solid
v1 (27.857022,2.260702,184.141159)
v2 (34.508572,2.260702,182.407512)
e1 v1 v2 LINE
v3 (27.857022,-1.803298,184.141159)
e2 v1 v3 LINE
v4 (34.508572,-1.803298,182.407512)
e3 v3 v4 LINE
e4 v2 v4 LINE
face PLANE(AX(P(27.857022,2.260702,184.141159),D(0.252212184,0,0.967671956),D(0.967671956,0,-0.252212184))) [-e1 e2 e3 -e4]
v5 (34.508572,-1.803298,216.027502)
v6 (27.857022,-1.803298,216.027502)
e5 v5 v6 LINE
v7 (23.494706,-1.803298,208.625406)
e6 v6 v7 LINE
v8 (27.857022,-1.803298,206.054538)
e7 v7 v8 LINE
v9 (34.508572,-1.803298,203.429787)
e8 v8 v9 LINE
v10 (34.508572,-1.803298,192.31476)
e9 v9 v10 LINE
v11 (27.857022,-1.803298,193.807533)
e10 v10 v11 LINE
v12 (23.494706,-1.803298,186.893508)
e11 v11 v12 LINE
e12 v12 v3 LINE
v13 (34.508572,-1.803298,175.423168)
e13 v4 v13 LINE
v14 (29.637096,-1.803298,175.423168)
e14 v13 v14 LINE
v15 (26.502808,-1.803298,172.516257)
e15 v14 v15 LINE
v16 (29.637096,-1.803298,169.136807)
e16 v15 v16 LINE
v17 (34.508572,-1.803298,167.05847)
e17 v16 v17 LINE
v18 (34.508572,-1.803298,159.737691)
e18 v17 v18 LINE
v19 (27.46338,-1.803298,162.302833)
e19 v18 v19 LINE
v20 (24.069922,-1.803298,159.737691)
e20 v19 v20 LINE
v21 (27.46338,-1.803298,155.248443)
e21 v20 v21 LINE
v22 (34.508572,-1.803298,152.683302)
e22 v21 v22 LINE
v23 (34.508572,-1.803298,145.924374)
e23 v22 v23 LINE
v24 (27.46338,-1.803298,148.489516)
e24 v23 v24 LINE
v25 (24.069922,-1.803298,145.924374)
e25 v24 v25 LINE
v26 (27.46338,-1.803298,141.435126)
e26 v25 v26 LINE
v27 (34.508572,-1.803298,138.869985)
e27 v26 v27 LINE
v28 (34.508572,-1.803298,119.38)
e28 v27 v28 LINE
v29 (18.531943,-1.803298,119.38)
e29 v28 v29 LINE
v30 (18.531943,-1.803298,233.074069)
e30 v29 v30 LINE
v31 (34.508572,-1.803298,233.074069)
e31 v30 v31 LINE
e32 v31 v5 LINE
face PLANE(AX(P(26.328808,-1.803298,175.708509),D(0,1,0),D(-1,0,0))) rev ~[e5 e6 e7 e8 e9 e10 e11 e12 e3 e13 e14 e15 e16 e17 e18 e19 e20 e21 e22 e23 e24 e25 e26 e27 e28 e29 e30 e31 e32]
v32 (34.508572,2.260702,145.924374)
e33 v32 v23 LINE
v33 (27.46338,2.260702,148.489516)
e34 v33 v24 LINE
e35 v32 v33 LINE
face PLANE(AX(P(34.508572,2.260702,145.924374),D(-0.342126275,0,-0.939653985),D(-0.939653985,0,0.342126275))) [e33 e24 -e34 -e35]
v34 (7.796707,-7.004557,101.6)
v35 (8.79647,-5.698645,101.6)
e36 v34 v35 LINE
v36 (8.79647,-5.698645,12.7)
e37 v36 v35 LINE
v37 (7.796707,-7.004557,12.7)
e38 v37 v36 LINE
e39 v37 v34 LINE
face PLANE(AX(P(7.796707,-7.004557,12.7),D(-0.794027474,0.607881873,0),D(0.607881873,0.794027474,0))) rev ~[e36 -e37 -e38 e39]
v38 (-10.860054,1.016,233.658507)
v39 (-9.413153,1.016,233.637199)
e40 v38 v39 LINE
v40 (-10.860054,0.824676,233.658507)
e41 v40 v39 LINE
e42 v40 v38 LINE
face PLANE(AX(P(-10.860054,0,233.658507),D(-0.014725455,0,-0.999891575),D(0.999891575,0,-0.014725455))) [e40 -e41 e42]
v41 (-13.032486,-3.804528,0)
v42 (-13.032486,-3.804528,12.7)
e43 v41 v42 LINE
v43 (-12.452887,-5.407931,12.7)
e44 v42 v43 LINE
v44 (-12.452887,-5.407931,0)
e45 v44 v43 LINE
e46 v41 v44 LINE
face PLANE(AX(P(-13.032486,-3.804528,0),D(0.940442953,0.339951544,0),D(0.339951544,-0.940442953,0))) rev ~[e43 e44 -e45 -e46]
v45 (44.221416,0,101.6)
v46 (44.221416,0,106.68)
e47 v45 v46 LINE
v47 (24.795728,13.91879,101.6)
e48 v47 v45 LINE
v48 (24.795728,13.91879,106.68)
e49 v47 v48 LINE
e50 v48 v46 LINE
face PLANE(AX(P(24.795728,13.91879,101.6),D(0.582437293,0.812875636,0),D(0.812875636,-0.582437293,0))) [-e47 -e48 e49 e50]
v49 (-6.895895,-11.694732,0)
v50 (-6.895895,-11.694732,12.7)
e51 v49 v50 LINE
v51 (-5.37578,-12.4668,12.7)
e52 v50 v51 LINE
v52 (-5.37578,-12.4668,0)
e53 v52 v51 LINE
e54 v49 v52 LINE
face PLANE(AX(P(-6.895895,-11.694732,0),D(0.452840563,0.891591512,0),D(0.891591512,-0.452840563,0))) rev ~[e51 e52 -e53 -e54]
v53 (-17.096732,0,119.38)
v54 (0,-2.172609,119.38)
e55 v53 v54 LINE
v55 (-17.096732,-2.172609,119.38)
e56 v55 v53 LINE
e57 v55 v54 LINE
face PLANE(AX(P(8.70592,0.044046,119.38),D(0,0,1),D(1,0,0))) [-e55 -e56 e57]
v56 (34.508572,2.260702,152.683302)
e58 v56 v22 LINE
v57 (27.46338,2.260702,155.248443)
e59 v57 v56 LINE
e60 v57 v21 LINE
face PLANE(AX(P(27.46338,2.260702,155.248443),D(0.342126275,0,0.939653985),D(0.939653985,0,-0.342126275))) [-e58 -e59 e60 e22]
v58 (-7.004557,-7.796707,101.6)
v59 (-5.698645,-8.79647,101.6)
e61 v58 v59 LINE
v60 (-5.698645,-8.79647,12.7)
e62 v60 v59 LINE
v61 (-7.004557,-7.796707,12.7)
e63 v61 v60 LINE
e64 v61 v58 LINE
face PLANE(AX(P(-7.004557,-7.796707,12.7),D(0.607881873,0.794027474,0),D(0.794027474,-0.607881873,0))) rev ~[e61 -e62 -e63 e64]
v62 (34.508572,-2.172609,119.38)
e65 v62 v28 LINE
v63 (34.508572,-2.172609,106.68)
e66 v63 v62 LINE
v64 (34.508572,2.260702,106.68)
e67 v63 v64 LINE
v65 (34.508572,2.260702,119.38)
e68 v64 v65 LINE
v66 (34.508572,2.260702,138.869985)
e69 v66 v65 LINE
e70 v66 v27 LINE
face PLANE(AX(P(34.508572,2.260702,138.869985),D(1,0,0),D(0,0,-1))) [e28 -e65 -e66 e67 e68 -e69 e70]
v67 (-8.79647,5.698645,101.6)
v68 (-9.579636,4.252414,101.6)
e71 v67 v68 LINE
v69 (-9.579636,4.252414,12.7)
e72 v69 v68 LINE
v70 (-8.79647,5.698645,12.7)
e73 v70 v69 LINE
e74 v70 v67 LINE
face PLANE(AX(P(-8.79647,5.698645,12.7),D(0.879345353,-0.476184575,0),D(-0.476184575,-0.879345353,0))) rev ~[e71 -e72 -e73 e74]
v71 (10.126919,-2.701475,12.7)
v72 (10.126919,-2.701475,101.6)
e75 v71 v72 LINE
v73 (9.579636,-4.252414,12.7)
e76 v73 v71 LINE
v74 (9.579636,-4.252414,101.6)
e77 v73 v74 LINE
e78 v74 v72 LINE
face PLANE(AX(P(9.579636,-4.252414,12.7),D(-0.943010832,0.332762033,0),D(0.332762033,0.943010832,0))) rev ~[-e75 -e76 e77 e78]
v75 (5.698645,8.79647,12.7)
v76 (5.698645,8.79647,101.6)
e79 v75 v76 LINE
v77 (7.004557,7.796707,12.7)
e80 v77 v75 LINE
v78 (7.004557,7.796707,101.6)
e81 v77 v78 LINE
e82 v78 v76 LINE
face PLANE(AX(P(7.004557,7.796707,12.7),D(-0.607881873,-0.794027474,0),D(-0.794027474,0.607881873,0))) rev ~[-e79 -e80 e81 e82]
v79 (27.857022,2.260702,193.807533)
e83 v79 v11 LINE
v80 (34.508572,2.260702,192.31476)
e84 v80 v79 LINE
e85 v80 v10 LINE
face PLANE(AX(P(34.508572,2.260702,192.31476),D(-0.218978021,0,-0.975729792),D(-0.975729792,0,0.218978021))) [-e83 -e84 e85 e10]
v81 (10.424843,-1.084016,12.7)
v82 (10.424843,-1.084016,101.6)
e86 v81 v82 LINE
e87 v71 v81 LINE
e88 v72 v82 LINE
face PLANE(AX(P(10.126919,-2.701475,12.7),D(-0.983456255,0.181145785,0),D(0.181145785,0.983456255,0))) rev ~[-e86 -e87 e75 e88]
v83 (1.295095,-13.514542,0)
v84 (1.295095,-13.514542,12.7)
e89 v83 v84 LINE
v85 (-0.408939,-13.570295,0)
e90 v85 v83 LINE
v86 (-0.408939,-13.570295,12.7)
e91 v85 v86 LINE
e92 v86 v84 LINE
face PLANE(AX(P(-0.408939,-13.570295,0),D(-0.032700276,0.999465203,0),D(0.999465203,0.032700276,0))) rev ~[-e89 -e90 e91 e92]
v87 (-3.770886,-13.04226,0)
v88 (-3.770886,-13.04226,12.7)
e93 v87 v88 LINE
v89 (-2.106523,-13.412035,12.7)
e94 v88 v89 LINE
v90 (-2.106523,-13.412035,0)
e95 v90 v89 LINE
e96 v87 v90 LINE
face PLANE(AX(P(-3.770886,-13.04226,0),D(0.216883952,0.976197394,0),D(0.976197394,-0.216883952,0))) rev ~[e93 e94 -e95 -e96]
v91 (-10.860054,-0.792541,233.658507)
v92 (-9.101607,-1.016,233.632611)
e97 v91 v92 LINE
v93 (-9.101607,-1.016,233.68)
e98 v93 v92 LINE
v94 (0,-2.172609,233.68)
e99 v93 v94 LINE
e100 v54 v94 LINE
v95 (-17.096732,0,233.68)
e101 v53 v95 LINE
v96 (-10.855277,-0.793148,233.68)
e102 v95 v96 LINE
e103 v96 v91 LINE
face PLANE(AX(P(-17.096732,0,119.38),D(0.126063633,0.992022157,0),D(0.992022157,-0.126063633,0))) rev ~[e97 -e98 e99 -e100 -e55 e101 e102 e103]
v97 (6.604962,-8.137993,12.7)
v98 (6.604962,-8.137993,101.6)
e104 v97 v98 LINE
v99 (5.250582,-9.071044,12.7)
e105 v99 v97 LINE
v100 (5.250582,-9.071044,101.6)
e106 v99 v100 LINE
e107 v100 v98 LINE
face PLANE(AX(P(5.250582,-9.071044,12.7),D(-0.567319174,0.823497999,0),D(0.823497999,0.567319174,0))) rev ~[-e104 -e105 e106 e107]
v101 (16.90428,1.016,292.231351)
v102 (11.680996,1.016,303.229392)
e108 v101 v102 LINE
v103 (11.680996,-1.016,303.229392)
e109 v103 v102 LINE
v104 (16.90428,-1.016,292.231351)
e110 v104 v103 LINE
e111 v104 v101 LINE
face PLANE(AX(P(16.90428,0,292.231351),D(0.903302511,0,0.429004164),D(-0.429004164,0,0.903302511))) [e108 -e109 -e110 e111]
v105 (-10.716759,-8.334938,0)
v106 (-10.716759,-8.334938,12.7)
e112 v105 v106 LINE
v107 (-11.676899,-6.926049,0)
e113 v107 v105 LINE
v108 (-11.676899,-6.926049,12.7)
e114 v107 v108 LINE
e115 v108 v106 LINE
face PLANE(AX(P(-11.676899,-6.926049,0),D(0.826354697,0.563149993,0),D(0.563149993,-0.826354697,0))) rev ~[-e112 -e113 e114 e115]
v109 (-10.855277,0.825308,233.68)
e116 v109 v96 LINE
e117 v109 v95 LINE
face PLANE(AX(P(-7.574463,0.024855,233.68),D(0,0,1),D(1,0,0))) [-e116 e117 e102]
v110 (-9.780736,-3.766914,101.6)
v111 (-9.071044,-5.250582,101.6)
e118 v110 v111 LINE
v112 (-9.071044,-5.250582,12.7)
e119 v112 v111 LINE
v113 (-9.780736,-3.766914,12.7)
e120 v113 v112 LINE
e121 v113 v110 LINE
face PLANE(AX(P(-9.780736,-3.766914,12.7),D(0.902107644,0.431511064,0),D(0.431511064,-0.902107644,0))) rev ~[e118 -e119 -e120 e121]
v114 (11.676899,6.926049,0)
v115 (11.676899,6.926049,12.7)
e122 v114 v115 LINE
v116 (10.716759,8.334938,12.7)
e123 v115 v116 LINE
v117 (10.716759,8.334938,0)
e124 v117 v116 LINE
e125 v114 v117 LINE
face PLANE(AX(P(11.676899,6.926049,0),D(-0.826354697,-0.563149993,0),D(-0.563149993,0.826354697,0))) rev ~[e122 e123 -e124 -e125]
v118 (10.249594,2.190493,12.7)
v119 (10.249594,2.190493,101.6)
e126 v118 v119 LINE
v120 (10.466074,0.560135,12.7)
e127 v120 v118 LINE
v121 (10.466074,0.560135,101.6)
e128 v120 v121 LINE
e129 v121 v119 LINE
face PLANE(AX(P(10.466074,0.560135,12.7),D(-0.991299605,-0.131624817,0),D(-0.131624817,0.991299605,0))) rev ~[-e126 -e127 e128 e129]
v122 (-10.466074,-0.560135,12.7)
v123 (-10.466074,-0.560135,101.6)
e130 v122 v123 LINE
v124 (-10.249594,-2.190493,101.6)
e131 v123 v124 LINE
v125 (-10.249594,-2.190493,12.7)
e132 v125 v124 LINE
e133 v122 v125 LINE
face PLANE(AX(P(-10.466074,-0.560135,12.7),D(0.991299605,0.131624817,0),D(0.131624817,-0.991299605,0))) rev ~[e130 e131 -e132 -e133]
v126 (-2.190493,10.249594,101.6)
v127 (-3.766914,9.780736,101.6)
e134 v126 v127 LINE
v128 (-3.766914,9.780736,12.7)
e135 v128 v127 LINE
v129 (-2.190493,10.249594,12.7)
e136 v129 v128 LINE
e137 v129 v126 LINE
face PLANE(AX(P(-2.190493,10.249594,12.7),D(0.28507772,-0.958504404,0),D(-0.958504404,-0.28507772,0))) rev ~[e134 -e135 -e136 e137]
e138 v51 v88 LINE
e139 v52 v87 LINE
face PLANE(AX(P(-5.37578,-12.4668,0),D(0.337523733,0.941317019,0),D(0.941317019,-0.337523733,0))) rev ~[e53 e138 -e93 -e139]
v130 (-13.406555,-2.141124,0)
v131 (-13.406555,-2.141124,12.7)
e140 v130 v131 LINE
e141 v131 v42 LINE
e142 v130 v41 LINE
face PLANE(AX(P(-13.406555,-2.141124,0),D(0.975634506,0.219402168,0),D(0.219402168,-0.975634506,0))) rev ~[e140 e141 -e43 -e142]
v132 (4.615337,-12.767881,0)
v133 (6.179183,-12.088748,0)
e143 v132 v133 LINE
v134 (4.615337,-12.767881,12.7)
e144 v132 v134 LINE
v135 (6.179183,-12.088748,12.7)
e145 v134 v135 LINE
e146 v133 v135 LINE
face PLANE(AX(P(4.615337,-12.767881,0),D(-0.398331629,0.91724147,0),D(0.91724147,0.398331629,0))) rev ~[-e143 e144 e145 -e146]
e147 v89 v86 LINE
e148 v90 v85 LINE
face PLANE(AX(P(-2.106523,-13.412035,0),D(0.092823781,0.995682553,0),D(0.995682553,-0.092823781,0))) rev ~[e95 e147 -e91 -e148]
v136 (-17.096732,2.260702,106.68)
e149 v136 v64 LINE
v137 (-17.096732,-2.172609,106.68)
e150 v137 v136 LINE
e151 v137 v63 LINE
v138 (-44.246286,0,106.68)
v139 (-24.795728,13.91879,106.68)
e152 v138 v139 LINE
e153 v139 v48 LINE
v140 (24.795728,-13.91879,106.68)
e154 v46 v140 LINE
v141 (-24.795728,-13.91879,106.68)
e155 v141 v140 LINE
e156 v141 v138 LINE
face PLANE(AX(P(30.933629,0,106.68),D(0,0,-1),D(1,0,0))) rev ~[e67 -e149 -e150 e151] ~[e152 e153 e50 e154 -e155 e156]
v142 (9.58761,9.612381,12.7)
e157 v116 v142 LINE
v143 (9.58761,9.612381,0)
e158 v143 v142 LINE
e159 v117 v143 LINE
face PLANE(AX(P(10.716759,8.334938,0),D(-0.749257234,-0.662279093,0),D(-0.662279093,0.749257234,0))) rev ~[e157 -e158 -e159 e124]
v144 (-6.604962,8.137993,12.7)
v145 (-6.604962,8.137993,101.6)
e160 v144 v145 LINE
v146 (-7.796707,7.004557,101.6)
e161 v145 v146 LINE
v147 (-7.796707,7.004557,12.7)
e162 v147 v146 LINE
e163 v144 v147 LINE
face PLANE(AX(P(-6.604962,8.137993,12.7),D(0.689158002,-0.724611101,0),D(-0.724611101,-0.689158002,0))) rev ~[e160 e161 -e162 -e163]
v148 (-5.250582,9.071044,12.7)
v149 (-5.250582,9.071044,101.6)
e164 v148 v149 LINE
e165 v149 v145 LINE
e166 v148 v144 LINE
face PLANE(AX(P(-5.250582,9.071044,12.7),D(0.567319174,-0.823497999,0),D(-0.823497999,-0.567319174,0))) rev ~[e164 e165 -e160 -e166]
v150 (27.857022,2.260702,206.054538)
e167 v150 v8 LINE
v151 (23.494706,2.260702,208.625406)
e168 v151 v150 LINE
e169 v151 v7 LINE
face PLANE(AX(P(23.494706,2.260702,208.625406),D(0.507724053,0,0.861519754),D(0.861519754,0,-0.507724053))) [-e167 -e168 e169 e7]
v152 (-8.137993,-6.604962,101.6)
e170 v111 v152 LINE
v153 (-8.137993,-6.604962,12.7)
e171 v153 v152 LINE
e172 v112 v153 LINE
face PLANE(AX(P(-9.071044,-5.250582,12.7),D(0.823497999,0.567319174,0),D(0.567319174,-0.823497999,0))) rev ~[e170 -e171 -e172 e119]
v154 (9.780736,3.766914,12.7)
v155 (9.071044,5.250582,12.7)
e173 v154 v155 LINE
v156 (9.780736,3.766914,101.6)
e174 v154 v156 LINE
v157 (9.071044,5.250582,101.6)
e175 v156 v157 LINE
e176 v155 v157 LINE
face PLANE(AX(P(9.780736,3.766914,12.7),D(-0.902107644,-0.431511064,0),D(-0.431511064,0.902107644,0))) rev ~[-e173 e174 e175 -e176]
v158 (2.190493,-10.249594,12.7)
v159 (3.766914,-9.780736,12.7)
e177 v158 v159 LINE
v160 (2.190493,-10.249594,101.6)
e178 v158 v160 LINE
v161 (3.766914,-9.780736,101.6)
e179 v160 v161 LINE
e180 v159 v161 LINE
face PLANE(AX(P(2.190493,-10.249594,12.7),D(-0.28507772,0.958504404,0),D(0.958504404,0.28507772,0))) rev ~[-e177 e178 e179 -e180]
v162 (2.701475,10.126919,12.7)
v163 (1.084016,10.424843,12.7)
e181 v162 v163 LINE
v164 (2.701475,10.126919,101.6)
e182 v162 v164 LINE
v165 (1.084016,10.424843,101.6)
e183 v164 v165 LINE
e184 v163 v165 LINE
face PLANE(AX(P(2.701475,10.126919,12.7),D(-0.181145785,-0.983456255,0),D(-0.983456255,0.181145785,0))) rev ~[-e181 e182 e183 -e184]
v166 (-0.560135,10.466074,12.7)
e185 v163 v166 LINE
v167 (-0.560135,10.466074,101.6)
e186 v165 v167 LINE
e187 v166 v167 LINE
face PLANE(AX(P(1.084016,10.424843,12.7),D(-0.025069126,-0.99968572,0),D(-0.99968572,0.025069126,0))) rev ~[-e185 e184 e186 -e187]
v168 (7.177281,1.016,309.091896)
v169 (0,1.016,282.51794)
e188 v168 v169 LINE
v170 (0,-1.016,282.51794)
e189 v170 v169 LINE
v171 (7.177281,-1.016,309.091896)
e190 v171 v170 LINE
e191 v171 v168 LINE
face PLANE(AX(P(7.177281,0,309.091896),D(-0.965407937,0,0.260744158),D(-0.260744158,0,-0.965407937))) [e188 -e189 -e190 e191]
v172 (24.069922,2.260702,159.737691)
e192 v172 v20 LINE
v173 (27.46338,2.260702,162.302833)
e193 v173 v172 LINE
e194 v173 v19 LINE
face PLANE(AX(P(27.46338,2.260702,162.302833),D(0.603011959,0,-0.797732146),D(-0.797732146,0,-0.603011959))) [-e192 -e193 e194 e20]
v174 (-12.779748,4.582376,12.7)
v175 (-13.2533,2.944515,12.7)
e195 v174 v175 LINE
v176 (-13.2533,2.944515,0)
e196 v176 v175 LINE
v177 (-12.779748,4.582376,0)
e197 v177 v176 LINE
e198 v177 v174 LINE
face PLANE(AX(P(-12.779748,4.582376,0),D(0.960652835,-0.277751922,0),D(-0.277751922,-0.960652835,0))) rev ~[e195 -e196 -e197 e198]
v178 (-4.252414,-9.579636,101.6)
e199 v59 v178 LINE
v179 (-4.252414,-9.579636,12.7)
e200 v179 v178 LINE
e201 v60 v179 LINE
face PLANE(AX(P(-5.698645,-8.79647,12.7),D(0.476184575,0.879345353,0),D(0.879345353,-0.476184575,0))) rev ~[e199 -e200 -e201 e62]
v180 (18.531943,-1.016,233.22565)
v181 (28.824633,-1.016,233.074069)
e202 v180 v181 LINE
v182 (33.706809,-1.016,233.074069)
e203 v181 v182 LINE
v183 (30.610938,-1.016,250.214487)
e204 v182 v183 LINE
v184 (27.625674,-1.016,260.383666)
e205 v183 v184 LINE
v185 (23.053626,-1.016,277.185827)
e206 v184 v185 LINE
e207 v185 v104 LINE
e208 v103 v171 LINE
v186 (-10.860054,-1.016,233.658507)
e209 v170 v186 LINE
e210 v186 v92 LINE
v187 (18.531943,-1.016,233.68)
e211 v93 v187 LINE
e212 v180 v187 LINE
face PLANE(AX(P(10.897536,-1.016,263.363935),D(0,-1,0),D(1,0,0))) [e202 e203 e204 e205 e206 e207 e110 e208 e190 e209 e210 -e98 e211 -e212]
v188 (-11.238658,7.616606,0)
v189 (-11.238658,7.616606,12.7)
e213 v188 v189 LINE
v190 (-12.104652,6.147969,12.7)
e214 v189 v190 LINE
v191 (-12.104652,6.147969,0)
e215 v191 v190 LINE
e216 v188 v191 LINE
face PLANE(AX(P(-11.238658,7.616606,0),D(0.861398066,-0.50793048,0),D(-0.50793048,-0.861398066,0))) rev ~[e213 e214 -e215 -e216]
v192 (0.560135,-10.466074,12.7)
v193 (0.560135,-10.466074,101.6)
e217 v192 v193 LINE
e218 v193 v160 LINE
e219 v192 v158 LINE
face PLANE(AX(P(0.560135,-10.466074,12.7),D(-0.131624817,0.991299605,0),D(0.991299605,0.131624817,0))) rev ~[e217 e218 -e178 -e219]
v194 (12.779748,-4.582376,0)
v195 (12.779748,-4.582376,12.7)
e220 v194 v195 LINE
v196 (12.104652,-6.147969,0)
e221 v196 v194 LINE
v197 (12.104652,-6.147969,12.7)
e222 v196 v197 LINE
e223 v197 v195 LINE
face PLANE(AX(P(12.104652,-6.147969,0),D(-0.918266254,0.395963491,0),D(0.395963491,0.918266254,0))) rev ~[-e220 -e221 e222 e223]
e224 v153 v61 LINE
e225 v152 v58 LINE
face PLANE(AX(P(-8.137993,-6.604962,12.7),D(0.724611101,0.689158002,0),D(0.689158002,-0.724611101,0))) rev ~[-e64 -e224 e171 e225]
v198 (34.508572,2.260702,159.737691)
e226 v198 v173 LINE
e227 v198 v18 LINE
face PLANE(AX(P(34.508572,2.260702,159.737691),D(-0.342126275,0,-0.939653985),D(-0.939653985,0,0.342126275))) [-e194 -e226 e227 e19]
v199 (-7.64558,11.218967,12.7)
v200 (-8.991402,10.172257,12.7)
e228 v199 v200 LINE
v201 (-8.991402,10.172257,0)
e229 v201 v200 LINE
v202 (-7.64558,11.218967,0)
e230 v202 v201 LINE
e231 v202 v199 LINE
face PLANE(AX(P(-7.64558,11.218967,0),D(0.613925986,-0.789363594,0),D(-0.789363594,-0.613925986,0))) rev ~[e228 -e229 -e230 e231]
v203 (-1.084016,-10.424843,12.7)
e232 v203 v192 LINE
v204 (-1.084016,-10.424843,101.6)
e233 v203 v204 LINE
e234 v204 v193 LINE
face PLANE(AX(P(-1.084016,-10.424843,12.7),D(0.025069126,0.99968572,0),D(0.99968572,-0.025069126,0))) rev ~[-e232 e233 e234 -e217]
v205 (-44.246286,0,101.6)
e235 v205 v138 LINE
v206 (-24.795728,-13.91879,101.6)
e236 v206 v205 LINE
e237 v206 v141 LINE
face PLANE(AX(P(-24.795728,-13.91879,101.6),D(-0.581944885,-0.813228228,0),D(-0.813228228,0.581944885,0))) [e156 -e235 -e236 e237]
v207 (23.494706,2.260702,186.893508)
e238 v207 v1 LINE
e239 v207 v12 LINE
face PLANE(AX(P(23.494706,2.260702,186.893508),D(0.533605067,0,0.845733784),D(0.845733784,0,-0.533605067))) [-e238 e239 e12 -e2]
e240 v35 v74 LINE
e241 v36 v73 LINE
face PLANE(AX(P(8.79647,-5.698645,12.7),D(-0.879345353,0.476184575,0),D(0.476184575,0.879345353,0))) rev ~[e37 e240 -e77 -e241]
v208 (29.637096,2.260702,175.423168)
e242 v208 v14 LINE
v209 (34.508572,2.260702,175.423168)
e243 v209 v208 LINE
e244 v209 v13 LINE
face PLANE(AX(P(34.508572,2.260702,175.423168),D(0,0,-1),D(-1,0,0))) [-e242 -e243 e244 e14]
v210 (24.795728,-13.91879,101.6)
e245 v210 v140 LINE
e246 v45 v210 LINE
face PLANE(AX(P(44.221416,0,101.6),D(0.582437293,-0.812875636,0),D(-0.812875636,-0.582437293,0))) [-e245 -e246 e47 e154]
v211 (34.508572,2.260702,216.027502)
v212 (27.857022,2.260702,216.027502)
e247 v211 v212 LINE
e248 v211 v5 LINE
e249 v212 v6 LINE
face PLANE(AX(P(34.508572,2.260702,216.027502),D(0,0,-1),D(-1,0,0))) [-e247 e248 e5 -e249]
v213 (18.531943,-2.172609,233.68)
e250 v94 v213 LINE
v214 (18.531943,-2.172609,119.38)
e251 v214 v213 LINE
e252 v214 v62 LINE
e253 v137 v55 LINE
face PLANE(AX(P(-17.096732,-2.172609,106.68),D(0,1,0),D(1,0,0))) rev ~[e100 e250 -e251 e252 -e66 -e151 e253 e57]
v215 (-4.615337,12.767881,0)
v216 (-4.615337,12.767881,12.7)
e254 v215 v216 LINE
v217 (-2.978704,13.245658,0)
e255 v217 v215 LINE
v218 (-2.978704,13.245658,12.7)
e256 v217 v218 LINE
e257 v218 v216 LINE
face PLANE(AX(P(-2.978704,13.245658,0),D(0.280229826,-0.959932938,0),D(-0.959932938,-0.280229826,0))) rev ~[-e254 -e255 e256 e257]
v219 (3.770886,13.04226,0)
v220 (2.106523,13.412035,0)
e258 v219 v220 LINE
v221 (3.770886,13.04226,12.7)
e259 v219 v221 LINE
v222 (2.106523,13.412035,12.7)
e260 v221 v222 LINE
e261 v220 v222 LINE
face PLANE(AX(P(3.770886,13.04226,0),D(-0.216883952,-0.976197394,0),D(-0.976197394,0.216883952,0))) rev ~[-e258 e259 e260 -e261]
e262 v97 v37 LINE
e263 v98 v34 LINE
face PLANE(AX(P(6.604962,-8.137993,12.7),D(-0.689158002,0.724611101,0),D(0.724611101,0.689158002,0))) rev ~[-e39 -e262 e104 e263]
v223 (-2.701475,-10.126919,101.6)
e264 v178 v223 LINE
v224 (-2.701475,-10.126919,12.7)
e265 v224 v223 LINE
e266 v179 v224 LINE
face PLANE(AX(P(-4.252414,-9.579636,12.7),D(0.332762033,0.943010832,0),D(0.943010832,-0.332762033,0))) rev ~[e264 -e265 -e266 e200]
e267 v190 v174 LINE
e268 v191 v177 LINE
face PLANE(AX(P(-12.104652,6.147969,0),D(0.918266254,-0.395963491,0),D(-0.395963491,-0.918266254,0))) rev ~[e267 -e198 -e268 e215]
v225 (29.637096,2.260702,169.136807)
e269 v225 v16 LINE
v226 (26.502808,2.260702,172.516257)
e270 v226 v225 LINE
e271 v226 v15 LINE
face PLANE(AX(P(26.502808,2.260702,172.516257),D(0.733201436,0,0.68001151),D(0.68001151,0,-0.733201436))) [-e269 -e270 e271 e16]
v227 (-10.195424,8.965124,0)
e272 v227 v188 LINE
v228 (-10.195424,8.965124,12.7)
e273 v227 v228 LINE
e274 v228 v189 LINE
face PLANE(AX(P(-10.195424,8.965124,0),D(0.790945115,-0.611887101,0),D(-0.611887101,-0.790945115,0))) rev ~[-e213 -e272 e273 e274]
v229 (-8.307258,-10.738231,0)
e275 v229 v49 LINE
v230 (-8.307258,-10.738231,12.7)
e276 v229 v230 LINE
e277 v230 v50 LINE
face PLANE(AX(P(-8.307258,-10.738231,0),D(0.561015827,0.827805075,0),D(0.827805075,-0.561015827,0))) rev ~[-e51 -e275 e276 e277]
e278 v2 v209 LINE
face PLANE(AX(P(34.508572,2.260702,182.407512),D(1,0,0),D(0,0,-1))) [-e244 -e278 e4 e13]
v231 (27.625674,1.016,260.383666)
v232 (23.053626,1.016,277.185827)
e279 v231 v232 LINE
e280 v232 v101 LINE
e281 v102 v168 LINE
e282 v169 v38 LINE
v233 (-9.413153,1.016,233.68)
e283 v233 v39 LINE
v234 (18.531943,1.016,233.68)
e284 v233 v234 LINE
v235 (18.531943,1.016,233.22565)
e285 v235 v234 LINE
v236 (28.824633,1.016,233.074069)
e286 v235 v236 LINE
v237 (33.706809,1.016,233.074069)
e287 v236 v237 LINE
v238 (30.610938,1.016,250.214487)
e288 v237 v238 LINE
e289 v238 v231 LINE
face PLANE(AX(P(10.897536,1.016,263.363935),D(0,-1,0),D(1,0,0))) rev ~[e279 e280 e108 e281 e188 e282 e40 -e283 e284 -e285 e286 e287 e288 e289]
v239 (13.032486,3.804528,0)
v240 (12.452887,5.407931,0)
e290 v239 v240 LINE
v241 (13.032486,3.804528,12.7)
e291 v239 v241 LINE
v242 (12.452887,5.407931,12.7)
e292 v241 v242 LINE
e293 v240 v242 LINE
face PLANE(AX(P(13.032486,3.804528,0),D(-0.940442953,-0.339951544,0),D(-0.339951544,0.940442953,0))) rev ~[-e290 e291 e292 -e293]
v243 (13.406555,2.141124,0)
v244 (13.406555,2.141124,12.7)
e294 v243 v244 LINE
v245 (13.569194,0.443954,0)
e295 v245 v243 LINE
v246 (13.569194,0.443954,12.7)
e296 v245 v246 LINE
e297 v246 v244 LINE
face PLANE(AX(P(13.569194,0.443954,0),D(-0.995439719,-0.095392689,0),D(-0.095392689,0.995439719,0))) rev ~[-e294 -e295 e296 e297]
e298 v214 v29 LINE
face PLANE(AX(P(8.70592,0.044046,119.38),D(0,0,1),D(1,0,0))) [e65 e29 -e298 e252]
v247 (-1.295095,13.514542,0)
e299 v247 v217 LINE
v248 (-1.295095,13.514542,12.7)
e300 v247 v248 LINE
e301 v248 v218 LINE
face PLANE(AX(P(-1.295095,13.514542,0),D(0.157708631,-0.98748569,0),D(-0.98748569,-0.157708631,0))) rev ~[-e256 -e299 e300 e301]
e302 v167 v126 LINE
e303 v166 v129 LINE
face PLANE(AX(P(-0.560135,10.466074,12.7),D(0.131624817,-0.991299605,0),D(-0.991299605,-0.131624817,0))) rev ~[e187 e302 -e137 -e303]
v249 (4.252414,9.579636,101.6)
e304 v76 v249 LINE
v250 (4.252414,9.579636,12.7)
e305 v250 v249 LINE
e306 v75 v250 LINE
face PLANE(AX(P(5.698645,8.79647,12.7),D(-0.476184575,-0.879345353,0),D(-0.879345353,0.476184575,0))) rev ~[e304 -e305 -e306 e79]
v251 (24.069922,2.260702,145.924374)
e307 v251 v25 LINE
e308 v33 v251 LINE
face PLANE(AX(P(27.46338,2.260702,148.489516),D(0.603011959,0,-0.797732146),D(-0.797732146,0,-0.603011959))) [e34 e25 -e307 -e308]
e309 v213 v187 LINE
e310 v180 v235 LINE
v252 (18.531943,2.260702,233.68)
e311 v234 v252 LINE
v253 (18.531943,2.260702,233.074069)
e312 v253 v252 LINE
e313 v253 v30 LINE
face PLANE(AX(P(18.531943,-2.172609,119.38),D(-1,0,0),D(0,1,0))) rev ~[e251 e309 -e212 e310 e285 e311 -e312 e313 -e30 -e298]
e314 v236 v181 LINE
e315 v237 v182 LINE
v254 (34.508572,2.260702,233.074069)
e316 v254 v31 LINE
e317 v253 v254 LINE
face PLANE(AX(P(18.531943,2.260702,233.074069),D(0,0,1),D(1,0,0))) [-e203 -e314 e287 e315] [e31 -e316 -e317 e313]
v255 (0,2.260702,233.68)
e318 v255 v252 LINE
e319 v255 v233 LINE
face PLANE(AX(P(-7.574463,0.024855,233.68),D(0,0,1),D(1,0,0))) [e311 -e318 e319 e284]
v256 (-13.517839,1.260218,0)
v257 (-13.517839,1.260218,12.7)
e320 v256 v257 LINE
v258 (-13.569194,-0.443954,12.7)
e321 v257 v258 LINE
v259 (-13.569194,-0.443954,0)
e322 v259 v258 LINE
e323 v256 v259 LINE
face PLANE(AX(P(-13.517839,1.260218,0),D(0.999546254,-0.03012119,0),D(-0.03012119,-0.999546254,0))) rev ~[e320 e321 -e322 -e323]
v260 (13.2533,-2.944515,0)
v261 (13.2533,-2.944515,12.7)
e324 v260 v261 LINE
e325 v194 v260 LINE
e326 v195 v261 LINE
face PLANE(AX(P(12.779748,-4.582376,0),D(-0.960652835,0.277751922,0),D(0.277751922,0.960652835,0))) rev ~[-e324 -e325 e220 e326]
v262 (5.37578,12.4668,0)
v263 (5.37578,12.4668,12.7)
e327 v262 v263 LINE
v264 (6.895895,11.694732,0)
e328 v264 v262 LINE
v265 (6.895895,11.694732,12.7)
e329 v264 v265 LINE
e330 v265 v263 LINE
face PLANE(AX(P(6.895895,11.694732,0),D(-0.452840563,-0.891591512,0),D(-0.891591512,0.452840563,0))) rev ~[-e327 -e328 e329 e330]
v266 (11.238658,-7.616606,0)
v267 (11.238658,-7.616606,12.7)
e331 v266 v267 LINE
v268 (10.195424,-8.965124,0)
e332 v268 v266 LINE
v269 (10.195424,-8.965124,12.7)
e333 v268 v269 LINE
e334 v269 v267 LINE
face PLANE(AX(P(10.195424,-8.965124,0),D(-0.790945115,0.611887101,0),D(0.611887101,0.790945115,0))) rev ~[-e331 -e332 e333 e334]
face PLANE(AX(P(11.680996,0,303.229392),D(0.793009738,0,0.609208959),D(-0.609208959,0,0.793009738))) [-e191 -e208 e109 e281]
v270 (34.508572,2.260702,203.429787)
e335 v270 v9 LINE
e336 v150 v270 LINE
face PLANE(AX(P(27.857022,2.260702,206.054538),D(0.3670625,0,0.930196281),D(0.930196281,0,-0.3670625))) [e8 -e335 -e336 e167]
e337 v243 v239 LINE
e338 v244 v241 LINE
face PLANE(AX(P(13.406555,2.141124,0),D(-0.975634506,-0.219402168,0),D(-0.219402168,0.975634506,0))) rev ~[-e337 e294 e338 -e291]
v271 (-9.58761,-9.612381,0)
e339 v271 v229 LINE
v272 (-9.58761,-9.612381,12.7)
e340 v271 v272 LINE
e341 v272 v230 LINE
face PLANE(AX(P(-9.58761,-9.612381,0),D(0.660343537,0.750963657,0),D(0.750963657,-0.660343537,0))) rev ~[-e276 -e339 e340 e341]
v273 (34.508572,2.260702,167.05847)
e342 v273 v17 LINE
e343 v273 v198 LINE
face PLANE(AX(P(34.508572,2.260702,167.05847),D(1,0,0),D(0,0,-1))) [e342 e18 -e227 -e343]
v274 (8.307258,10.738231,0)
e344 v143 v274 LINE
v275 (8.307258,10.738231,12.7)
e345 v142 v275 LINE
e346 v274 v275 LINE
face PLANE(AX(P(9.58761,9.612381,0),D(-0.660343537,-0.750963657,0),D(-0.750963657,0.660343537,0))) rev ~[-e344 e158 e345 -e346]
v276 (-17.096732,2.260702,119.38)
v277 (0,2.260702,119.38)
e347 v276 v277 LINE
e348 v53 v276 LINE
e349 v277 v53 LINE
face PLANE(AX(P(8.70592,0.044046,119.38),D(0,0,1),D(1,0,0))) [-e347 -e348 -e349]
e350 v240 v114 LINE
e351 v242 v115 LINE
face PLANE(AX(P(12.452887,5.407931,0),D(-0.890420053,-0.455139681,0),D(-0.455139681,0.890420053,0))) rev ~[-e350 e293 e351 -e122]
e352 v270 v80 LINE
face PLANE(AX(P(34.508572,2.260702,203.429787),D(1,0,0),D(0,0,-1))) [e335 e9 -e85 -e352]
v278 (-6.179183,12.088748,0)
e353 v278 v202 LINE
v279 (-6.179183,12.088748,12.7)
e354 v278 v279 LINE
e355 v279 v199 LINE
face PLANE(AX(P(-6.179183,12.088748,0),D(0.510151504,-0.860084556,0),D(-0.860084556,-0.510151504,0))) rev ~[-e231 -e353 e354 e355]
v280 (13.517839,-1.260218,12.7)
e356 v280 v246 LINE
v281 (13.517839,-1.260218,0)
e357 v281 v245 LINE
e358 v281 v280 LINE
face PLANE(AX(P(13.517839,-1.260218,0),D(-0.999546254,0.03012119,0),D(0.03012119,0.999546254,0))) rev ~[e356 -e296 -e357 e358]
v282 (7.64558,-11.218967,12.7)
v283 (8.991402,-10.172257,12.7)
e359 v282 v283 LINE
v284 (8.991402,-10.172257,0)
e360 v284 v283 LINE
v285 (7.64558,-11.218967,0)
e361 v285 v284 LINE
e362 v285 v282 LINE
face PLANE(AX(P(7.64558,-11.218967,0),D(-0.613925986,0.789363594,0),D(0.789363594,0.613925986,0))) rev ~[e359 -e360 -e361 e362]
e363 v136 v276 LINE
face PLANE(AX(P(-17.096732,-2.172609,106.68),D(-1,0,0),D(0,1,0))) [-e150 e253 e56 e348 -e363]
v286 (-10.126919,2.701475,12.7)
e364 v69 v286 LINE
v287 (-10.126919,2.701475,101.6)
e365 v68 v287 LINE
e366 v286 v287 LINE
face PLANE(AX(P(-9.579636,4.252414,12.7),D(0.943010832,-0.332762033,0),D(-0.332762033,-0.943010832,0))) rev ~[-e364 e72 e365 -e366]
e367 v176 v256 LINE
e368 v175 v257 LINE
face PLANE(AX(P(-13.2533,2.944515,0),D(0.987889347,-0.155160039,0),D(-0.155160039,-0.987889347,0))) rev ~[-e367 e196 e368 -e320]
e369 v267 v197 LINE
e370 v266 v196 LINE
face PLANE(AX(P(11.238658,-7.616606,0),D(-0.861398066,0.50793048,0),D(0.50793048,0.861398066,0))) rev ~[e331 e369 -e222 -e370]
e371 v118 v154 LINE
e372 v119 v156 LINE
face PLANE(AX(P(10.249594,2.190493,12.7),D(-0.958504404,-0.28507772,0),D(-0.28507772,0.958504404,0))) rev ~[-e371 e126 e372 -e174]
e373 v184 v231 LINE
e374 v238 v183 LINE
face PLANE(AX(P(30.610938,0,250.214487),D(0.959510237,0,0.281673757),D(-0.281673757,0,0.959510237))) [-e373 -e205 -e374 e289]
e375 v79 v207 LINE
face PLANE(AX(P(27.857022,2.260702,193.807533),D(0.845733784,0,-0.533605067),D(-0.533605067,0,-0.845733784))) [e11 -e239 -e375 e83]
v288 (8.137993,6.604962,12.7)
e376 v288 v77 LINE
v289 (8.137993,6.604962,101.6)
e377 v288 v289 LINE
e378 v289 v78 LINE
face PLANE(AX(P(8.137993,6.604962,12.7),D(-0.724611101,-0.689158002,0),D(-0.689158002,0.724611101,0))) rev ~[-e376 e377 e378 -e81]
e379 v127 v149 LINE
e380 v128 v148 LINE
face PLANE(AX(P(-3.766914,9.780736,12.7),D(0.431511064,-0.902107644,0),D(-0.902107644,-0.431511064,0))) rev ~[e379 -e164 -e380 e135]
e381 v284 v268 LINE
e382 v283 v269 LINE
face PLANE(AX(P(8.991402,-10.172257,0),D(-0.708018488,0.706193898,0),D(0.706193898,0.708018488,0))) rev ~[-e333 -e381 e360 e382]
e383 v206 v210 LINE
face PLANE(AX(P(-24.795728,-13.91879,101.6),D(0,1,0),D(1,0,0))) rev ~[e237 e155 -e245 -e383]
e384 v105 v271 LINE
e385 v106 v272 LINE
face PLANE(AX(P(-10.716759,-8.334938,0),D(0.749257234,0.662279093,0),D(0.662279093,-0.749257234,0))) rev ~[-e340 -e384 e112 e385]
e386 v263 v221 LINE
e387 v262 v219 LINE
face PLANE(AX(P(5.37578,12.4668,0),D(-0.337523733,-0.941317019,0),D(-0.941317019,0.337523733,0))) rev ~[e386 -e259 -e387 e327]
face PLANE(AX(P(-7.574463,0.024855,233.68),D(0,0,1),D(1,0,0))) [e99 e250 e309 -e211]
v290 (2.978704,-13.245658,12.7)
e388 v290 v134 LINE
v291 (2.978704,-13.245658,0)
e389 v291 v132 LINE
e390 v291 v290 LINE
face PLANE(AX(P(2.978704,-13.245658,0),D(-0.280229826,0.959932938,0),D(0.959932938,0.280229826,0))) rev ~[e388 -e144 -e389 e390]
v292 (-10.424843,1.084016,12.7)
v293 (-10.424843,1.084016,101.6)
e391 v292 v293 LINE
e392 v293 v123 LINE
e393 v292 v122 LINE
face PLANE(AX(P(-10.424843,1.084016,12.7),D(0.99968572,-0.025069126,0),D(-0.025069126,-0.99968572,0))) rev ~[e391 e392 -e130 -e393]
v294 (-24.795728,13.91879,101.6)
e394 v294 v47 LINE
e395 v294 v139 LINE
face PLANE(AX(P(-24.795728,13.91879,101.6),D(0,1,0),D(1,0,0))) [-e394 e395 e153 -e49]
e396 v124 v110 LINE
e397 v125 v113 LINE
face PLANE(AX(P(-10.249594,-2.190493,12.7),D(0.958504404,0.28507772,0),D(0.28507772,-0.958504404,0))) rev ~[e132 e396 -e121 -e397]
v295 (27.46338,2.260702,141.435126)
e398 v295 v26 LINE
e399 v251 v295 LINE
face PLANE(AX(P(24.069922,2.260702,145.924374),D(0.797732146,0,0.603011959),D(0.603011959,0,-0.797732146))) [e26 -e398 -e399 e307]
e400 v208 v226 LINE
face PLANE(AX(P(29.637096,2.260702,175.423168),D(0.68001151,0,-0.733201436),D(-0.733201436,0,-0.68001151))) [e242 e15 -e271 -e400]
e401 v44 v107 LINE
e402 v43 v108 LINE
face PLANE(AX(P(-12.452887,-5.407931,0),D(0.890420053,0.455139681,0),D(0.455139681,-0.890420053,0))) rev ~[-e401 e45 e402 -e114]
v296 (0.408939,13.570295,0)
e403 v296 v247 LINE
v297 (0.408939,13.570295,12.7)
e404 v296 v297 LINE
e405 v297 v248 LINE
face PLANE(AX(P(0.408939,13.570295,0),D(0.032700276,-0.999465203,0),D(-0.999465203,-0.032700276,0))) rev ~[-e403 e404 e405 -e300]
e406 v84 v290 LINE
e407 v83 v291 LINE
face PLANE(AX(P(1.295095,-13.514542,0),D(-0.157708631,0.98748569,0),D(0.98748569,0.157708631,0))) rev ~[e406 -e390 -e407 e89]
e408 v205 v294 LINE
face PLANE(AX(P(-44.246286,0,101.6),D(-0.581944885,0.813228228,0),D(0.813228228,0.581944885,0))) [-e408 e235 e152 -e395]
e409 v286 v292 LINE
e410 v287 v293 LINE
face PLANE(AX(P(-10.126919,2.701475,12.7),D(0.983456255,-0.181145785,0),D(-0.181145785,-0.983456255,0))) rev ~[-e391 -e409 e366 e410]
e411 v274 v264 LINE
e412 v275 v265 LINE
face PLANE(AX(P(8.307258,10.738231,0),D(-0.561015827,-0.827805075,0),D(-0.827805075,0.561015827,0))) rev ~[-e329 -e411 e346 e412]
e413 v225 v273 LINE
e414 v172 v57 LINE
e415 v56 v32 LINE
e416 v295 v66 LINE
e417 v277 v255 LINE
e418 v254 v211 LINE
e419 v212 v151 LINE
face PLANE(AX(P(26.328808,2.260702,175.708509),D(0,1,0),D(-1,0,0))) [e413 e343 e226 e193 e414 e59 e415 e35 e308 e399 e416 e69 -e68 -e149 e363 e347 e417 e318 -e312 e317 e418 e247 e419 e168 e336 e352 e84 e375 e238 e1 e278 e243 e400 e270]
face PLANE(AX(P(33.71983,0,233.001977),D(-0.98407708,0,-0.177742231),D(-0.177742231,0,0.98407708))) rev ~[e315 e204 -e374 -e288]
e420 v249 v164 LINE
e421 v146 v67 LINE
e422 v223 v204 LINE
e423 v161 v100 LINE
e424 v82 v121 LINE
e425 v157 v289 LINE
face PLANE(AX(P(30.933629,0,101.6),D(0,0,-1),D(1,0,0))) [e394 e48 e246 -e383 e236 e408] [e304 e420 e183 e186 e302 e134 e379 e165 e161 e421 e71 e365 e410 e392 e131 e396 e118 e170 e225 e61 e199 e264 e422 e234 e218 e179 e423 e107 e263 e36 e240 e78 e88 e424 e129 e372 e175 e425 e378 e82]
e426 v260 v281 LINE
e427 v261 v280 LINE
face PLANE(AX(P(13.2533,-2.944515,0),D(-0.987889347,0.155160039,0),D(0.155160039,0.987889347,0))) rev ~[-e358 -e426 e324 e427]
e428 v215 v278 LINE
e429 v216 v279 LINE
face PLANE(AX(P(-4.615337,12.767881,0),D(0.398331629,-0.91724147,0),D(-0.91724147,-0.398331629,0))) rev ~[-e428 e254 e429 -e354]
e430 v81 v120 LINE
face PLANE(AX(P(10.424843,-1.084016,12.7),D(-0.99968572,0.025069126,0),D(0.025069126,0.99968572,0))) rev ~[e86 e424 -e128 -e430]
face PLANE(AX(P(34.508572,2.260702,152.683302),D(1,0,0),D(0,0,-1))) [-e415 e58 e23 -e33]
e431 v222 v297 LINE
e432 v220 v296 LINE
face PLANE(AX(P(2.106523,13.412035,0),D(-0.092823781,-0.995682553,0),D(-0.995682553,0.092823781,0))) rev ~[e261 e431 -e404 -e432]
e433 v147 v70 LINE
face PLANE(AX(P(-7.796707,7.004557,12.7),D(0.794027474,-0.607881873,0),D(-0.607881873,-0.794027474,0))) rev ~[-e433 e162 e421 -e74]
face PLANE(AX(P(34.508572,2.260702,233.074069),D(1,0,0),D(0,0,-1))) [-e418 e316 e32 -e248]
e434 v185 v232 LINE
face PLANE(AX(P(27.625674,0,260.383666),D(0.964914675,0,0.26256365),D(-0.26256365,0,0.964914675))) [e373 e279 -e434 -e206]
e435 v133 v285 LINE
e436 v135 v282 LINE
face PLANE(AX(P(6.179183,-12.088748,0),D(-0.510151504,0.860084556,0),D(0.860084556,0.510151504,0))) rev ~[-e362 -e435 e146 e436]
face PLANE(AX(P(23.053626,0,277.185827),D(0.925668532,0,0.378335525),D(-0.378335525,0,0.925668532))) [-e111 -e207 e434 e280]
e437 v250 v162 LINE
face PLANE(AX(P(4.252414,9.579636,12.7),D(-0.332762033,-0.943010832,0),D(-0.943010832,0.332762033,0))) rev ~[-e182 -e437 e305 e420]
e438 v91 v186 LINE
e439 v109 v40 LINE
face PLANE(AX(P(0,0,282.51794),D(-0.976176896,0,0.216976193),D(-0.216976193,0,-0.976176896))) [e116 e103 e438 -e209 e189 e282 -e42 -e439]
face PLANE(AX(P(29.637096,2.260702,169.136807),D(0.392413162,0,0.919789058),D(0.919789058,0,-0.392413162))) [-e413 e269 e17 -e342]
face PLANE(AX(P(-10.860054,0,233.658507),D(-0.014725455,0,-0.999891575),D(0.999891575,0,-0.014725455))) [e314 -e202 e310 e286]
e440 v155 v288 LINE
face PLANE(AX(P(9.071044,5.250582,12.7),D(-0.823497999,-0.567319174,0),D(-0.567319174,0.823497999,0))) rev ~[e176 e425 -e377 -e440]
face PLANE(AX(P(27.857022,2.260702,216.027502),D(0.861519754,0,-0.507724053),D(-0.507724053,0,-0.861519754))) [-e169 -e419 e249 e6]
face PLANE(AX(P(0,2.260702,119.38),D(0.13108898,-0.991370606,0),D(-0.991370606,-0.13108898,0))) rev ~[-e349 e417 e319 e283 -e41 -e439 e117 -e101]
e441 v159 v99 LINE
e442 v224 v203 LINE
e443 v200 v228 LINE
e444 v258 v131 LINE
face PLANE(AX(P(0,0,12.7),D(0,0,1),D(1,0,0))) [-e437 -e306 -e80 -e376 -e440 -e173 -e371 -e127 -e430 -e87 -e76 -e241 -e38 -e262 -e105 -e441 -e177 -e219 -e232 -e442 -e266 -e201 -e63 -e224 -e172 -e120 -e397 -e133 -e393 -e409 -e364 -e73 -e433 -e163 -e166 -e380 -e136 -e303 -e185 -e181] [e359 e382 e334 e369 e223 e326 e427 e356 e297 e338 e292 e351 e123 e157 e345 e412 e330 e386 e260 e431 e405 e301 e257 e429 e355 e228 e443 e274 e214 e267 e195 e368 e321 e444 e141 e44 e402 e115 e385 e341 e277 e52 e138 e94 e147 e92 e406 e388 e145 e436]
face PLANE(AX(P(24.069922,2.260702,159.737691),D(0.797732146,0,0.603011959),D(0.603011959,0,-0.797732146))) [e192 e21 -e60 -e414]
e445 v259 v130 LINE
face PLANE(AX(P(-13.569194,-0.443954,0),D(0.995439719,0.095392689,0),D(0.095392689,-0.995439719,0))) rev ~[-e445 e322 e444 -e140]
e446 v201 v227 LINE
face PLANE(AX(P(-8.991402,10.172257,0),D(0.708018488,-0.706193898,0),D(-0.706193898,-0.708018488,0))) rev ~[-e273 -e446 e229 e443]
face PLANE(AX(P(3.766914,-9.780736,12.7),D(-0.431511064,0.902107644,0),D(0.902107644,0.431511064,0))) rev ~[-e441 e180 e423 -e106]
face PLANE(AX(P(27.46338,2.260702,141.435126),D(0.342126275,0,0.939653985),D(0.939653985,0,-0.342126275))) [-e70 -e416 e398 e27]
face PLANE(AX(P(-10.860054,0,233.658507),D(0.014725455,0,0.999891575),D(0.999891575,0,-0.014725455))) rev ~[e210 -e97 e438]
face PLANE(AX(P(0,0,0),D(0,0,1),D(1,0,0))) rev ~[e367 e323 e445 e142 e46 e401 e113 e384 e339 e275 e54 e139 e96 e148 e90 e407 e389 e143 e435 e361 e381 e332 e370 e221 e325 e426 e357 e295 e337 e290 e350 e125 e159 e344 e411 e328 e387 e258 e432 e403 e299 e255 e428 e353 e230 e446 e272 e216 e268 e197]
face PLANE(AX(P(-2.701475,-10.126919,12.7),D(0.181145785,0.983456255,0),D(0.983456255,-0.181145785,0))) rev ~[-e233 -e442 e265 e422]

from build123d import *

# Parameters (mm, degrees)
F1_DEPTH  = 12.7
F3_DEPTH  = 88.9
F4_W      = 49.5914556086
F4_H      = 27.8375800699
F5_DEPTH  = 5.08
F7_DEPTH  = 5.08
F8_DEPTH  = 5.08
F9_W      = 51.6053037718
F9_H      = 4.4333104743
F10_DEPTH = 12.7
F11_W     = 18.5319427401
F11_H     = 4.4333104743
F12_DEPTH = 114.3
F14_DEPTH = 114.3
F16_DEPTH = 4.064
F18_DEPTH = 1.016
F19_DEPTH = 1.016


# Not quite as in the source:
# - a length typed as a fraction of an inch, garbled in the dataset ("3 / 203.2 mm" for 3/8 in), is restored


with BuildPart() as f1:
    # F0 (on Top) → F1 (new body)
    with BuildSketch(Plane.XY):
        Polygon((7.6455804064, -11.218967169), (8.9914021538, -10.1722569471), (10.195424118, -8.9651241566), (11.2386581535, -7.6166060026), (12.1046518362, -6.147969422), (12.7797479285, -4.582375691), (13.2532997617, -2.9445151579), (13.5178391405, -1.2602178619), (13.569194121, 0.4439538226), (13.4065548043, 2.1411240902), (13.0324861096, 3.8045275518), (12.4528873238, 5.4079313412), (11.6768990658, 6.9260488228), (10.7167591342, 8.334938377), (9.5876095091, 9.612380974), (8.3072575547, 10.7382305809), (6.8958951862, 11.6947318768), (5.3757804312, 12.4668002649), (3.7708864074, 13.0422597655), (2.1065232524, 13.4120350386), (0.4089389673, 13.5702945071), (-1.2950945296, 13.5145423248), (-2.9787036121, 13.2456577368), (-4.6153367593, 12.7678812137), (-6.1791832887, 12.0887475767), (-7.6455804064, 11.218967169), (-8.9914021538, 10.1722569471), (-10.195424118, 8.9651241566), (-11.2386581535, 7.6166060026), (-12.1046518362, 6.147969422), (-12.7797479285, 4.582375691), (-13.2532997617, 2.9445151579), (-13.5178391405, 1.2602178619), (-13.569194121, -0.4439538226), (-13.4065548043, -2.1411240902), (-13.0324861096, -3.8045275518), (-12.4528873238, -5.4079313412), (-11.6768990658, -6.9260488228), (-10.7167591342, -8.334938377), (-9.5876095091, -9.612380974), (-8.3072575547, -10.7382305809), (-6.8958951862, -11.6947318768), (-5.3757804312, -12.4668002649), (-3.7708864074, -13.0422597655), (-2.1065232524, -13.4120350386), (-0.4089389673, -13.5702945071), (1.2950945296, -13.5145423248), (2.9787036121, -13.2456577368), (4.6153367593, -12.7678812137), (6.1791832887, -12.0887475767), align=None)
    extrude(amount=F1_DEPTH)

    # F2 (on face) → F3 (join)
    with BuildSketch(Plane.XY.offset(12.7)):
        Polygon((2.1904929984, -10.2495944917), (3.7669142259, -9.7807363749), (5.2505815234, -9.0710440681), (6.6049620782, -8.1379925514), (7.796706546, -7.0045566495), (8.7964702228, -5.6986453162), (9.5796356089, -4.2524144224), (10.1269185734, -2.7014749726), (10.4248431933, -1.0840162433), (10.4660735757, 0.5601345635), (10.2495944917, 2.1904929984), (9.7807363749, 3.7669142259), (9.0710440681, 5.2505815234), (8.1379925514, 6.6049620782), (7.0045566495, 7.796706546), (5.6986453162, 8.7964702228), (4.2524144224, 9.5796356089), (2.7014749726, 10.1269185734), (1.0840162433, 10.4248431933), (-0.5601345635, 10.4660735757), (-2.1904929984, 10.2495944917), (-3.7669142259, 9.7807363749), (-5.2505815234, 9.0710440681), (-6.6049620782, 8.1379925514), (-7.796706546, 7.0045566495), (-8.7964702228, 5.6986453162), (-9.5796356089, 4.2524144224), (-10.1269185734, 2.7014749726), (-10.4248431933, 1.0840162433), (-10.4660735757, -0.5601345635), (-10.2495944917, -2.1904929984), (-9.7807363749, -3.7669142259), (-9.0710440681, -5.2505815234), (-8.1379925514, -6.6049620782), (-7.0045566495, -7.796706546), (-5.6986453162, -8.7964702228), (-4.2524144224, -9.5796356089), (-2.7014749726, -10.1269185734), (-1.0840162433, -10.4248431933), (0.5601345635, -10.4660735757), align=None)
    extrude(amount=F3_DEPTH)

    # F4 (on face) → F5 (join)
    with BuildSketch(Plane.XY.offset(101.6)):
        Rectangle(F4_W, F4_H)
    extrude(amount=F5_DEPTH)

    # F6 (on face) → F7 (join)
    with BuildSketch(Plane(origin=(0, 0, 101.6), x_dir=(1, 0, 0), z_dir=(0, 0, -1))):
        Polygon((-44.2462861538, 0), (-24.7957278043, -13.9187900349), (-24.7957278043, 13.9187900349), align=None)
    extrude(amount=-F7_DEPTH)

    # F6 (on face) → F8 (join)
    with BuildSketch(Plane(origin=(0, 0, 101.6), x_dir=(1, 0, 0), z_dir=(0, 0, -1))):
        Polygon((24.7957278043, 13.9187900349), (24.7957278043, -13.9187900349), (44.2214161158, 0), align=None)
    extrude(amount=-F8_DEPTH)

    # F9 (on face) → F10 (join)
    with BuildSketch(Plane.XY.offset(106.68)):
        with Locations((8.7059200741, 0.0440463773)):
            Rectangle(F9_W, F9_H)
    extrude(amount=F10_DEPTH)

    # F11 (on face) → F12 (join)
    with BuildSketch(Plane.XY.offset(119.38)):
        with Locations((9.26597137, 0.0440463773)):
            Rectangle(F11_W, F11_H)
    extrude(amount=F12_DEPTH)

    # F13 (on face) → F14 (join)
    with BuildSketch(Plane.XY.offset(119.38)):
        Polygon((0, -2.1726088598), (0, 2.2607016144), (-17.0967318118, 0), align=None)
    extrude(amount=F14_DEPTH)

    # F15 (on face) → F16 (join)
    with BuildSketch(Plane(origin=(0, 2.2607016144, 0), x_dir=(-1, 0, 0), z_dir=(0, 1, 0))):
        Polygon((-34.50857196, 124.4318857789), (-34.50857196, 119.38), (-18.5319427401, 119.38), (-18.5319427401, 233.0740690231), (-34.50857196, 233.0740690231), (-34.50857196, 216.0275018554), (-27.85702236, 216.0275018554), (-23.4947055578, 208.6254060268), (-27.85702236, 206.0545384884), (-34.50857196, 203.4297866207), (-34.50857196, 192.3147596109), (-27.85702236, 193.8075326945), (-23.4947055578, 186.8935078382), (-27.85702236, 184.1411590576), (-34.50857196, 182.4075117771), (-34.50857196, 175.4231682831), (-29.6370955184, 175.4231682831), (-26.5028076246, 172.5162565708), (-29.6370955184, 169.1368073225), (-34.50857196, 167.0584704934), (-34.50857196, 159.7376912832), (-27.4633802474, 162.3028325299), (-24.0699224556, 159.7376912832), (-27.4633802474, 155.2484430598), (-34.50857196, 152.6833018131), (-34.50857196, 145.9243744612), (-27.4633802474, 148.4895157079), (-24.0699224556, 145.9243744612), (-27.4633802474, 141.4351262377), (-34.50857196, 138.869984991), (-34.50857196, 131.7707747221), align=None)
    extrude(amount=-F16_DEPTH)

    # F17 (on Front) → F18 (join)
    with BuildSketch(Plane.XZ):
        Polygon((-10.8600538224, 233.6585074663), (33.719830215, 233.0019772053), (30.6109376252, 250.2144873142), (27.6256743819, 260.3836655617), (23.0536255985, 277.1858274937), (16.9042795897, 292.2313511372), (11.6809960455, 303.2293915749), (7.1772807278, 309.0918958187), (0, 282.517939806), align=None)
    extrude(amount=F18_DEPTH)

    # F17 (on Front) → F19 (join)
    with BuildSketch(Plane.XZ):
        Polygon((-10.8600538224, 233.6585074663), (33.719830215, 233.0019772053), (30.6109376252, 250.2144873142), (27.6256743819, 260.3836655617), (23.0536255985, 277.1858274937), (16.9042795897, 292.2313511372), (11.6809960455, 303.2293915749), (7.1772807278, 309.0918958187), (0, 282.517939806), align=None)
    extrude(amount=-F19_DEPTH)


solid = f1.part
